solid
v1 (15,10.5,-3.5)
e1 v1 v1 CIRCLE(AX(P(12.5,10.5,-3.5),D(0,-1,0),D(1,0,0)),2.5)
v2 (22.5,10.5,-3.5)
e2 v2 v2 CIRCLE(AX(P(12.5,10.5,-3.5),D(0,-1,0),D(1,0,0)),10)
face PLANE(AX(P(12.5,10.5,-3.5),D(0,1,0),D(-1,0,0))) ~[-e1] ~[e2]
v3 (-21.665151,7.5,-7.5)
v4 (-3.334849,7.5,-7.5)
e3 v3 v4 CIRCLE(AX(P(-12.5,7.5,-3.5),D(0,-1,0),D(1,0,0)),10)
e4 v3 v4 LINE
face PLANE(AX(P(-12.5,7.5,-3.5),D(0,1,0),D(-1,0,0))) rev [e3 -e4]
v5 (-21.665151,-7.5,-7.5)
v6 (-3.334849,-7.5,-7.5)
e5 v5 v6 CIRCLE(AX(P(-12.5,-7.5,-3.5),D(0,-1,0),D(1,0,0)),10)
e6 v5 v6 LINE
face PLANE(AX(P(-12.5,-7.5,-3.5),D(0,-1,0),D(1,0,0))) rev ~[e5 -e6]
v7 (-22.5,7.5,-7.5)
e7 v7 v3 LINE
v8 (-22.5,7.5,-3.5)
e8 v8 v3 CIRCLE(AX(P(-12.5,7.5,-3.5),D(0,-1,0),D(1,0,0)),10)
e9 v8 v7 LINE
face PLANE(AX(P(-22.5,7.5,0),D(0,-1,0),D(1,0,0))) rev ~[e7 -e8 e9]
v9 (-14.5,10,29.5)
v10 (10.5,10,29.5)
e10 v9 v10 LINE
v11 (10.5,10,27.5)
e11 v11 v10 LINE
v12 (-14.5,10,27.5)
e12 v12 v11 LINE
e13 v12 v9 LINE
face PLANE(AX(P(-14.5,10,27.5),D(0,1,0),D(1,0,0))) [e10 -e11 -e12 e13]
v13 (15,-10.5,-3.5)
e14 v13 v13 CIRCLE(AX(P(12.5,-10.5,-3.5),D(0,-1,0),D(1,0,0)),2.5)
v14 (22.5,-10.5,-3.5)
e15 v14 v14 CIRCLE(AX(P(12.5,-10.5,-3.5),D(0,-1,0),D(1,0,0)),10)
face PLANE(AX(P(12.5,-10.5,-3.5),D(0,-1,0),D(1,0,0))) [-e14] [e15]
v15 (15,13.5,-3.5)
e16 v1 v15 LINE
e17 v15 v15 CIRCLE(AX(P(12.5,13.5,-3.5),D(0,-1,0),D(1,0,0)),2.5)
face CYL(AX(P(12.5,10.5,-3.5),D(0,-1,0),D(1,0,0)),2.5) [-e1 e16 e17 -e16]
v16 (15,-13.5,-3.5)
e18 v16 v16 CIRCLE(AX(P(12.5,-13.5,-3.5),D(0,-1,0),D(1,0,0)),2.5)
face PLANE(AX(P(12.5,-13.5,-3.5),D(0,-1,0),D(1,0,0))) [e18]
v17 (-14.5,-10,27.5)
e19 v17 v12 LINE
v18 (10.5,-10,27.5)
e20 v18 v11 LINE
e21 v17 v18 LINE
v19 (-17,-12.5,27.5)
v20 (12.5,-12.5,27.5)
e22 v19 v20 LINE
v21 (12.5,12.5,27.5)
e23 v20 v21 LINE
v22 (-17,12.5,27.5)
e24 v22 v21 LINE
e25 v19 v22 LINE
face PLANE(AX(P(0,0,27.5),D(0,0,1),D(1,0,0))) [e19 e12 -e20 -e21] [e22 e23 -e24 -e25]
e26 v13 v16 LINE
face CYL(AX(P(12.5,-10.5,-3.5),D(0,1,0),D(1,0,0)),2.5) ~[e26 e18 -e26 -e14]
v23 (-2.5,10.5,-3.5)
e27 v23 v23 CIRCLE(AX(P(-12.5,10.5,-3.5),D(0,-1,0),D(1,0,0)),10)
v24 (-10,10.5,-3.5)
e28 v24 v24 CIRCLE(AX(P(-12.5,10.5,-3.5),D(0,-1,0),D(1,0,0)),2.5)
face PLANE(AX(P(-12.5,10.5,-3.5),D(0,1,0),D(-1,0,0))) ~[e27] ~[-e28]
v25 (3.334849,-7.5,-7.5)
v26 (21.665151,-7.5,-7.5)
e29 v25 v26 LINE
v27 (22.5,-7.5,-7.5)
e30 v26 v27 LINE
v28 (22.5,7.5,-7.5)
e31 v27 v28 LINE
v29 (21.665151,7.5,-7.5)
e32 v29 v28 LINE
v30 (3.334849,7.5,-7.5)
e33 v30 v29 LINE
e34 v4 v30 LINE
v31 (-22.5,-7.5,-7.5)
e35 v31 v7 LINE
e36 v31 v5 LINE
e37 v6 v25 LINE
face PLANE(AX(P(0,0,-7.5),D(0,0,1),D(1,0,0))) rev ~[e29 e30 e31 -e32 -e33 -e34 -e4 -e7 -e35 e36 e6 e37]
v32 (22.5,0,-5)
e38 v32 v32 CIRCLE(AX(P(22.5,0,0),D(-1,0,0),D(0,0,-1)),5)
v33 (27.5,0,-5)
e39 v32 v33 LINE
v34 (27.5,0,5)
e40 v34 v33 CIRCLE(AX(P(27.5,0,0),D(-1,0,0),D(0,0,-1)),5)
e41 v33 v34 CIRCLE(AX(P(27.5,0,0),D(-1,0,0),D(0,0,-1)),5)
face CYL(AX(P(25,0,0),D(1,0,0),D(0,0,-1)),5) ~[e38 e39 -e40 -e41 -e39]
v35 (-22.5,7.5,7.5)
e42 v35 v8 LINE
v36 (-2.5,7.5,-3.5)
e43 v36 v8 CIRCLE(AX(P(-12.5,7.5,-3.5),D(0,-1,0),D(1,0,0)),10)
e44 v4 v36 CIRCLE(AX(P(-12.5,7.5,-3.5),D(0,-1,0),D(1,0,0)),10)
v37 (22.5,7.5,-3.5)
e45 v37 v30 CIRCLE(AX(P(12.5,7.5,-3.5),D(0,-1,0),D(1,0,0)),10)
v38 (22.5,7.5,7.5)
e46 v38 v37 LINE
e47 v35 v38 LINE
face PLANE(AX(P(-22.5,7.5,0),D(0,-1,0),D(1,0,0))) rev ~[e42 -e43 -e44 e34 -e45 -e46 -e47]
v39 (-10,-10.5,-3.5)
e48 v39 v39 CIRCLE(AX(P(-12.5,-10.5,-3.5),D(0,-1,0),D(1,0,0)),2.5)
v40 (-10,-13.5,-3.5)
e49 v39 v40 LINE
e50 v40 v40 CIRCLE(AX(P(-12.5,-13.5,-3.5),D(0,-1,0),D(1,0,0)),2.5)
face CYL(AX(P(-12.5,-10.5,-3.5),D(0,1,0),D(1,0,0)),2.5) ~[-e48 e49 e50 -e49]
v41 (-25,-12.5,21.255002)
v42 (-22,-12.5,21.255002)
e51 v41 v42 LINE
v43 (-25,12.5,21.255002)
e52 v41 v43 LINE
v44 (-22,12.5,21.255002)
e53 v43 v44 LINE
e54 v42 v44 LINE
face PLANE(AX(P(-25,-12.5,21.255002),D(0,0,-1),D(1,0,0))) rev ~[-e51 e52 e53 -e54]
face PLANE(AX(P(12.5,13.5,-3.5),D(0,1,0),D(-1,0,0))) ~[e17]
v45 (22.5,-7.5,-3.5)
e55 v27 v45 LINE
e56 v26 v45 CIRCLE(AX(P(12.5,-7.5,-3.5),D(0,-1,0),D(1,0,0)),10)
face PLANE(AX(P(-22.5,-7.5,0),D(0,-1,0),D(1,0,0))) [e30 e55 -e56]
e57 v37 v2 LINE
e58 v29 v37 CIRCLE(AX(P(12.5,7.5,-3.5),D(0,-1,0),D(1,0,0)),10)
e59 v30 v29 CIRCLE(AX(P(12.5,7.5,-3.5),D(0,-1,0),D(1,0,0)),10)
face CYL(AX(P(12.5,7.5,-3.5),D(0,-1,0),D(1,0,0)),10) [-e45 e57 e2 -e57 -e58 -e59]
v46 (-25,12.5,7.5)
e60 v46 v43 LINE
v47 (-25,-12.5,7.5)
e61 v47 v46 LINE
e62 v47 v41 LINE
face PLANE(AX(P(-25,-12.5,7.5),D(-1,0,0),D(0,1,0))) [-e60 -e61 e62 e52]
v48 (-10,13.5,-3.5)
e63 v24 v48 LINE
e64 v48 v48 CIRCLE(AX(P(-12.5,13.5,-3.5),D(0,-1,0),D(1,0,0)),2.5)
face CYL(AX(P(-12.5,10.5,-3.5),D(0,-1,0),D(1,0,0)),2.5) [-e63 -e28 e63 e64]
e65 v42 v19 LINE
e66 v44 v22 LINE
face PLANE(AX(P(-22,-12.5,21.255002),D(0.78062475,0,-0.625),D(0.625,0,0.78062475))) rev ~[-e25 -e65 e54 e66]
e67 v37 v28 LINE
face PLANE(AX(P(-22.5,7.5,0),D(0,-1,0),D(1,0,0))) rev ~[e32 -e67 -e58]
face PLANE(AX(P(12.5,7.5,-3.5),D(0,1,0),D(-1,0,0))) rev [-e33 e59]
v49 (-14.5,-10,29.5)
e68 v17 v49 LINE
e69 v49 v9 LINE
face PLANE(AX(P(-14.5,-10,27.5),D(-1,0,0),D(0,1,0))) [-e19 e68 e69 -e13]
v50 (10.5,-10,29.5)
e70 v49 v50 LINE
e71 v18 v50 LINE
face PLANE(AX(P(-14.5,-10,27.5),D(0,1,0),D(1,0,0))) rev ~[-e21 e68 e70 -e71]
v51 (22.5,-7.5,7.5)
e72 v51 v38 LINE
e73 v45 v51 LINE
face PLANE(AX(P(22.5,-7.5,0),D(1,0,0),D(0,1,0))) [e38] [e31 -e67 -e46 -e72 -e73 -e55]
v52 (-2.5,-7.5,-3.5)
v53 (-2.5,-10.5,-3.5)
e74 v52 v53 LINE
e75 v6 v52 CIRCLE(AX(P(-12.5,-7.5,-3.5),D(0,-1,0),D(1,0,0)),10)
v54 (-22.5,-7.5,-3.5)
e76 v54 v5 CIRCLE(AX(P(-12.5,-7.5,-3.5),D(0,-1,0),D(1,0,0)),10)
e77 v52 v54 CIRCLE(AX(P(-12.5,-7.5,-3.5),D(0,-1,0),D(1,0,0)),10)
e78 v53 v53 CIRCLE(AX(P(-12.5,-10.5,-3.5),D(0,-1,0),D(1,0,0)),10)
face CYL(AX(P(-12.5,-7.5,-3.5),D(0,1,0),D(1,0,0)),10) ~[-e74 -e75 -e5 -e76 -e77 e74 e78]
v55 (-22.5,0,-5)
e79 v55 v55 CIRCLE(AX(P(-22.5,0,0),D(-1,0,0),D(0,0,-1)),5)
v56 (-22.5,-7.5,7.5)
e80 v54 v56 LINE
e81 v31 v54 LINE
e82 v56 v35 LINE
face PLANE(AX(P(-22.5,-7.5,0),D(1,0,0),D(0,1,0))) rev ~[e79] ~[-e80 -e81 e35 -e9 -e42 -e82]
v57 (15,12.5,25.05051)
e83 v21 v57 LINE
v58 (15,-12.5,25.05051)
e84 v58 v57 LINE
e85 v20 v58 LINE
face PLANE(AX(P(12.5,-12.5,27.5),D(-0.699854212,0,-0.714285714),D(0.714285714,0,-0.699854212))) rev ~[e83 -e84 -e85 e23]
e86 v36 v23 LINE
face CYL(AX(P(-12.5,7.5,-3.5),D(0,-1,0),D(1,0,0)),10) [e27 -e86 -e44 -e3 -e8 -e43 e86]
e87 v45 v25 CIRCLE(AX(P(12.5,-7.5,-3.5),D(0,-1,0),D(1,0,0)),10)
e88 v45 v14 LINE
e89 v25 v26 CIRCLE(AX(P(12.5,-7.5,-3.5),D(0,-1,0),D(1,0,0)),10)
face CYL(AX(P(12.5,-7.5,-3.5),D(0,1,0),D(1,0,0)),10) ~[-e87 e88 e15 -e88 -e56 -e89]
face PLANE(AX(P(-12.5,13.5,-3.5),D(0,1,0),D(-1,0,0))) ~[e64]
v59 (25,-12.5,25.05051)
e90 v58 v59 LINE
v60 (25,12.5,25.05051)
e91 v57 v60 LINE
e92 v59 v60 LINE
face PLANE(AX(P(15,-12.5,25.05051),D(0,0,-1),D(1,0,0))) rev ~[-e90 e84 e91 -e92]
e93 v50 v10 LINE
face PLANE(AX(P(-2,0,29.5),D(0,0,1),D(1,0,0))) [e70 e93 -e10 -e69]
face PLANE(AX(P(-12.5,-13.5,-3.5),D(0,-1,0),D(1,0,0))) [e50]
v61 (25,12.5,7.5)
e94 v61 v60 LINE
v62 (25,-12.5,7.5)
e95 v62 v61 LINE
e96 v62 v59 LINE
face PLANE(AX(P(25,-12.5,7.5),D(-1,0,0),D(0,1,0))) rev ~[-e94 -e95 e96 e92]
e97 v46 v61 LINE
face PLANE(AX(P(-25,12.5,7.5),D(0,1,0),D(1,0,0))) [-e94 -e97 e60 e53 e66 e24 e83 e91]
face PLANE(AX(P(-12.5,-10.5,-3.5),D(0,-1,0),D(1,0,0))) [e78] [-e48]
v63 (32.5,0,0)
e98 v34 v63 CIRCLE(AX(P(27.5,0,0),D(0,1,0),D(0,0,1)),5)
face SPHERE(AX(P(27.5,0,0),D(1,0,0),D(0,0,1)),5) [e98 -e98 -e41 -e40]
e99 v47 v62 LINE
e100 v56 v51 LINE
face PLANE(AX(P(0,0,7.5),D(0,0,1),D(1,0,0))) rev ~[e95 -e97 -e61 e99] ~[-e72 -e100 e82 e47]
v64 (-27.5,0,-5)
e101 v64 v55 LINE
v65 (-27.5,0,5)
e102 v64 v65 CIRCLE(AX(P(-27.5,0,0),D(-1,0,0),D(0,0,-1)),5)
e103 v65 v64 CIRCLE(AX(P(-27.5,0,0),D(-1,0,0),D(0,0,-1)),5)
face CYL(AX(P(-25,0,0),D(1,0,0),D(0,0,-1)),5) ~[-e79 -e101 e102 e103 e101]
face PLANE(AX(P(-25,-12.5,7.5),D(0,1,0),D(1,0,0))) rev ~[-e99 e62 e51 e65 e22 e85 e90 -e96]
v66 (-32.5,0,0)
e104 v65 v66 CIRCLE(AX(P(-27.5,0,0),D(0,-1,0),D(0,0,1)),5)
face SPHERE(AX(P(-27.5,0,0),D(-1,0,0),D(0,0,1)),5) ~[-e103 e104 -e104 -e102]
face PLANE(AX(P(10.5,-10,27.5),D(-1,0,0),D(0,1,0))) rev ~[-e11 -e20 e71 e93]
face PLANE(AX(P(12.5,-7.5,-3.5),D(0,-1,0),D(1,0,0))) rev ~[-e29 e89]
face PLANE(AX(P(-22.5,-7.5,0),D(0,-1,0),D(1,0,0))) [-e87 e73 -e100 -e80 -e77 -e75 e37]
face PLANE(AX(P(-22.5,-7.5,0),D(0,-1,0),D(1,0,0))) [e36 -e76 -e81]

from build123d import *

# Parameters (mm, degrees)
F0_W      = 45
F0_H      = 15
F1_DEPTH  = 7.5
F2_W      = 50
F2_H      = 25
F3_DEPTH  = 20
F5_DEPTH  = 25
F7_DEPTH  = 25
F8_W      = 25
F8_H      = 20
F9_DEPTH  = 2
F11_W     = 5
F11_H     = 5
F13_W     = 5
F13_H     = 5
F15_R     = 10
F16_DEPTH = 3
F17_R     = 10
F18_DEPTH = 3
F19_R     = 2.5
F20_DEPTH = 3
F21_R     = 2.5
F22_DEPTH = 3


# Not quite as in the source:
# - a pattern or mirror of a feature is missing from the dataset's text; its kind, count and spacing are read off the source's solid


with BuildPart() as f1:
    # F0 (on Top) → F1 (new body, symmetric)
    with BuildSketch(Plane.XY):
        Rectangle(F0_W, F0_H)
    extrude(amount=F1_DEPTH, both=True)

    # F2 (on face) → F3 (join)
    with BuildSketch(Plane.XY.offset(7.5)):
        Rectangle(F2_W, F2_H)
    extrude(amount=F3_DEPTH)

    # F4 (on face) → F5 (cut, through all)
    with BuildSketch(Plane.XZ.offset(12.5)):
        Polygon((25, 27.5), (12.5, 27.5), (15, 25.0505102572), (25, 25.0505102572), align=None)
    extrude(amount=-F5_DEPTH, mode=Mode.SUBTRACT)

    # F6 (on face) → F7 (cut, through all)
    with BuildSketch(Plane.XZ.offset(12.5)):
        Polygon((-25, 27.5), (-25, 21.2550020016), (-22, 21.2550020016), (-17, 27.5), align=None)
    extrude(amount=-F7_DEPTH, mode=Mode.SUBTRACT)

    # F8 (on face) → F9 (join)
    with BuildSketch(Plane.XY.offset(27.5)):
        with Locations((-2, 0)):
            Rectangle(F8_W, F8_H)
    extrude(amount=F9_DEPTH)

    # F11 (on Front) → F12 (revolve)
    with BuildSketch(Plane.XZ):
        with Locations((25, -2.5)):
            Rectangle(F11_W, F11_H)
    revolve(axis=Axis((-8.4795374423, 0, 0), (-1, 0, 0)))

    # F13 (on Front) → F14 (revolve)
    with BuildSketch(Plane.XZ):
        with Locations((-25, -2.5)):
            Rectangle(F13_W, F13_H)
    revolve(axis=Axis((-8.4795374423, 0, 0), (-1, 0, 0)))

    # F15 (on face) → F16 (join)
    with BuildSketch(Plane.XZ.offset(7.5)):
        with Locations((-12.5, -3.5)):
            Circle(F15_R)
    f16 = extrude(amount=F16_DEPTH)

    # F16_copies: F16 across plane
    add(f16.mirror(Plane.ZX))

    # F17 (on face) → F18 (join)
    with BuildSketch(Plane.XZ.offset(7.5)):
        with Locations((12.5, -3.5)):
            Circle(F17_R)
    f18 = extrude(amount=F18_DEPTH)

    # F18_copies: F18 across plane
    add(f18.mirror(Plane.ZX))

    # F19 (on face) → F20 (join)
    with BuildSketch(Plane.XZ.offset(10.5)):
        with Locations((-12.5, -3.5)):
            Circle(F19_R)
    f20 = extrude(amount=F20_DEPTH)

    # F20_copies: F20 across plane
    add(f20.mirror(Plane.ZX))

    # F21 (on face) → F22 (join)
    with BuildSketch(Plane.XZ.offset(10.5)):
        with Locations((12.5, -3.5)):
            Circle(F21_R)
    f22 = extrude(amount=F22_DEPTH)

    # F22_copies: F22 across plane
    add(f22.mirror(Plane.ZX))

    # F23 (on Front) → F24 (revolve)
    with BuildSketch(Plane.XZ):
        with BuildLine():
            Line((-27.5, 0), (-27.5, 5))
            ThreePointArc((-27.5, 5), (-31.0355339059, 3.5355339059), (-32.5, 0))
            Line((-32.5, 0), (-27.5, 0))
        make_face()
    f24 = revolve(axis=Axis((-30, 0, 0), (1, 0, 0)))

    # F24_copies: F24 across plane
    add(f24.mirror(Plane(origin=(0, 0, 0), x_dir=(0, 0, 1), z_dir=(1, 0, 0))))


solid = f1.part
